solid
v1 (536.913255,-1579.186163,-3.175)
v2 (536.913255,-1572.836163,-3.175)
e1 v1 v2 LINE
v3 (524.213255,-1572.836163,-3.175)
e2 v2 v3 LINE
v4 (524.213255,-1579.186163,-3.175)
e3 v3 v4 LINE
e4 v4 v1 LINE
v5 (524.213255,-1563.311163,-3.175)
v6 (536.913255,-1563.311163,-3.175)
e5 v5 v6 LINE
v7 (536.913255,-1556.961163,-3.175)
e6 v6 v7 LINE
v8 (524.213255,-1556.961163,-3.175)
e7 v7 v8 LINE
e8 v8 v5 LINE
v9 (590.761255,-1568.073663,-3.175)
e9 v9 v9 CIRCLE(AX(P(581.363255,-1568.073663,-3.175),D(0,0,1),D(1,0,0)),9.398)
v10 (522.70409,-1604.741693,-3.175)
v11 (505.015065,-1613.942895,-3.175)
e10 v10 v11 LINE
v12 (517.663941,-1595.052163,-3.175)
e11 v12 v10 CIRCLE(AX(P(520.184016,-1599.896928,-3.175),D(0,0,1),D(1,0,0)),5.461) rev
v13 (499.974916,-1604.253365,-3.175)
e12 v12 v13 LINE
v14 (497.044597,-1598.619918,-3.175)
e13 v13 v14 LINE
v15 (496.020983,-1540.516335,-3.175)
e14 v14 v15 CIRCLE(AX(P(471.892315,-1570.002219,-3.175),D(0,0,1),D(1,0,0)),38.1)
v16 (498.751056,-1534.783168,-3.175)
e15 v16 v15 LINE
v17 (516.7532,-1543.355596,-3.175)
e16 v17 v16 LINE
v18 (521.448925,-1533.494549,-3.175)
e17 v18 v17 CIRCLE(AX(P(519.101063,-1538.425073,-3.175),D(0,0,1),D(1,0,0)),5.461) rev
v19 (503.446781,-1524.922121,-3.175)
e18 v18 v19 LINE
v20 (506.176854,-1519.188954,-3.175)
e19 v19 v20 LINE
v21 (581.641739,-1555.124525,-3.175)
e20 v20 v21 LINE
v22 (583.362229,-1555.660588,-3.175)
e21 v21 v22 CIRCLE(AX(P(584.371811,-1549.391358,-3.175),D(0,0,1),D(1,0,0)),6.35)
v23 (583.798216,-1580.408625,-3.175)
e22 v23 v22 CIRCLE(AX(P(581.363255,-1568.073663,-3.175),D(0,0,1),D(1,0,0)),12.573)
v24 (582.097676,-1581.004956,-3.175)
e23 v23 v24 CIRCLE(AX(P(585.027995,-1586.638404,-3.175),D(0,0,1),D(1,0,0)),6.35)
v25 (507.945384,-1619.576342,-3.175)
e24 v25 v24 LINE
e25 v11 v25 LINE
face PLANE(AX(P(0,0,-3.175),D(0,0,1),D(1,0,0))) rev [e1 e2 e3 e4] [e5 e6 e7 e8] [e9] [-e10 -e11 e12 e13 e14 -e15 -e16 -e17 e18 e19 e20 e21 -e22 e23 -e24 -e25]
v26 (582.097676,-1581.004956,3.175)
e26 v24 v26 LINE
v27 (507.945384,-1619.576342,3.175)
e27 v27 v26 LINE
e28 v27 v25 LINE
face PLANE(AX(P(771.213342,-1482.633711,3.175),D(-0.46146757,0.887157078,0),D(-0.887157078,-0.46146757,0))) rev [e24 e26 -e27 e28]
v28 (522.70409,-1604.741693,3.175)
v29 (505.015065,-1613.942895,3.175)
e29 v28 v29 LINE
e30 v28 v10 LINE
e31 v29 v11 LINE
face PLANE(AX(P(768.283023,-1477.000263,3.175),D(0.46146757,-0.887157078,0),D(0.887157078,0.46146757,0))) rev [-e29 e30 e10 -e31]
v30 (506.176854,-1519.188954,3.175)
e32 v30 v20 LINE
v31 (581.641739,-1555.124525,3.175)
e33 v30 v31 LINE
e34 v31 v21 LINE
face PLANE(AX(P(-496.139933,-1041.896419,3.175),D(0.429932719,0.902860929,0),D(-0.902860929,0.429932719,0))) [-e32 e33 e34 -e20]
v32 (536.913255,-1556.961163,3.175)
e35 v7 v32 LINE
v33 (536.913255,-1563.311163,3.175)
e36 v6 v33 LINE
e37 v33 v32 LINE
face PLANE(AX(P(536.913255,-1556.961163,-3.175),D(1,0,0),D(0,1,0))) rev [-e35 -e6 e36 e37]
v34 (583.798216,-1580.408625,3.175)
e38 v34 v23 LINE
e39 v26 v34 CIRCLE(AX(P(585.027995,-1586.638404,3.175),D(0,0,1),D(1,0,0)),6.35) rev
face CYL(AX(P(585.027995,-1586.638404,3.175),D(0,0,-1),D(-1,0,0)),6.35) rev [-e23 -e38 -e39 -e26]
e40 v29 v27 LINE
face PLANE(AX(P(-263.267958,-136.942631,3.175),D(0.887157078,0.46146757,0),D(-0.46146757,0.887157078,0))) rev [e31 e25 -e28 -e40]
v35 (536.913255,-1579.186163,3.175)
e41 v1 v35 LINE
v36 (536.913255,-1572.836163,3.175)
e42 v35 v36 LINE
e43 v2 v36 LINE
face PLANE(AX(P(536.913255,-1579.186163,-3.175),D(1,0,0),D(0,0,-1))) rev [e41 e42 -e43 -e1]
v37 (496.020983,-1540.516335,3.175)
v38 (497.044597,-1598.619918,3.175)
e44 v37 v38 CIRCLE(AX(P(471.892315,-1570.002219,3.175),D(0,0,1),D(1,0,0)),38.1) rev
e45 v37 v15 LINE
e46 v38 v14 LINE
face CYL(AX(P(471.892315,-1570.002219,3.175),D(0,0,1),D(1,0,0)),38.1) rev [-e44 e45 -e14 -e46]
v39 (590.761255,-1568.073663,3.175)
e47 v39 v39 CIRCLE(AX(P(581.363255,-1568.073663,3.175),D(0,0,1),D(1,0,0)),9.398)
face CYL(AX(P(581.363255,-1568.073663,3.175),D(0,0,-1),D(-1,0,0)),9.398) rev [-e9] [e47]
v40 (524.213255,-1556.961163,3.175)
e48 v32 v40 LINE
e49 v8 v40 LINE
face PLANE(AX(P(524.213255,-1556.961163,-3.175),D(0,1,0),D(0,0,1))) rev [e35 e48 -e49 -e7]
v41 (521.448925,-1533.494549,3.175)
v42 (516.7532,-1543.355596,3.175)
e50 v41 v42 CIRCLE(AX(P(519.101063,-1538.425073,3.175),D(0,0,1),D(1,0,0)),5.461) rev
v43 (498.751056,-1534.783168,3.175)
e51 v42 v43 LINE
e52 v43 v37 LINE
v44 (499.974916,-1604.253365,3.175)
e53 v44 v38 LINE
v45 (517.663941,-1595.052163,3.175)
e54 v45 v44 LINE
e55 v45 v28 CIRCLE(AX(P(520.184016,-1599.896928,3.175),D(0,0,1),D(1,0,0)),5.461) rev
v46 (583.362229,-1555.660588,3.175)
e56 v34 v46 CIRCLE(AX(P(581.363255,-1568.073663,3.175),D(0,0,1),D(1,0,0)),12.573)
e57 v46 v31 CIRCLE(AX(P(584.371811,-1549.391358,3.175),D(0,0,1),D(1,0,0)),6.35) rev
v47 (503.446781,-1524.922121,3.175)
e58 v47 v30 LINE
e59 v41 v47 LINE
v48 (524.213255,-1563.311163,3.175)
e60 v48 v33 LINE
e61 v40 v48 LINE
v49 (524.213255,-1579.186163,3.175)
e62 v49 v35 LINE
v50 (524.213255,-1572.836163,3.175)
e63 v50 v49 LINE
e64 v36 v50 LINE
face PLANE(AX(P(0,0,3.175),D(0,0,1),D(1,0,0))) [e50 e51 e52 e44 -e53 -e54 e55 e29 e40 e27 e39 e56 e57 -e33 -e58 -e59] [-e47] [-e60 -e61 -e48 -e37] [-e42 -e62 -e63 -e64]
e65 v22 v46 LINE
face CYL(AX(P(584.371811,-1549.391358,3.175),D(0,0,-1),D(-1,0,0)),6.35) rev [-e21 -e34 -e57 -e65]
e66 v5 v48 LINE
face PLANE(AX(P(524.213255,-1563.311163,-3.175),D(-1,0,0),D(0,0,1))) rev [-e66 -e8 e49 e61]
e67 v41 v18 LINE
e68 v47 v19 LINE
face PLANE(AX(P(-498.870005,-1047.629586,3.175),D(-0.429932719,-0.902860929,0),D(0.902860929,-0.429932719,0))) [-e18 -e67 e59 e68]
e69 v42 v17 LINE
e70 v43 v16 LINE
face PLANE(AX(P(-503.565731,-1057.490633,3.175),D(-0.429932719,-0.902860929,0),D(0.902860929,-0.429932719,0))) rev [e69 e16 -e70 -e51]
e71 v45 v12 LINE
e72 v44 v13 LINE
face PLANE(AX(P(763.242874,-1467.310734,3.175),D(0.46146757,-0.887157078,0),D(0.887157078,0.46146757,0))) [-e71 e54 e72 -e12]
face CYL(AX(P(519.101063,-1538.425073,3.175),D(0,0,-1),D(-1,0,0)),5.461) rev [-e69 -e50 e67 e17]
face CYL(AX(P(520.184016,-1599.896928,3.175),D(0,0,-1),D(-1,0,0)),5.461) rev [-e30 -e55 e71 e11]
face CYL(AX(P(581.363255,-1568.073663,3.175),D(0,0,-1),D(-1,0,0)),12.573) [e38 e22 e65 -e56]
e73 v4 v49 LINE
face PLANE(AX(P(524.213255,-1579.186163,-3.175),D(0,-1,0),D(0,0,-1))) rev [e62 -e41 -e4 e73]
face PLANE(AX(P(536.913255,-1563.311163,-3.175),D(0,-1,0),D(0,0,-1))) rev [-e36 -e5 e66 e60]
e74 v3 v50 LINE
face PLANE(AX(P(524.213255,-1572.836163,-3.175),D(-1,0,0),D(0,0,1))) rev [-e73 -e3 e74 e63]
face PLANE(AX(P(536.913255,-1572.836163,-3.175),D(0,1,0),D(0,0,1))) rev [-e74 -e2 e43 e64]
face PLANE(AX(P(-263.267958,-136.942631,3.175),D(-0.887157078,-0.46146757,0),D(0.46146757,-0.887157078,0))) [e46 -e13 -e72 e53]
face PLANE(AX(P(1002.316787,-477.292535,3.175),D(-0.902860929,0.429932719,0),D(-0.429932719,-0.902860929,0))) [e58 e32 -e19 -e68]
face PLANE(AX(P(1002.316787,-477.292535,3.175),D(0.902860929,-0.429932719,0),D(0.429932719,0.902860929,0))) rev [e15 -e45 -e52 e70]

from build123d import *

# Parameters (mm, degrees)
SKETCH1_R           = 12.573
SKETCH1_R_2         = 9.398
BOSS_EXTRUDE1_DEPTH = 3.175
FILLET1_R           = 38.1
FILLET2_R           = 6.35
SKETCH2_W           = 12.7
SKETCH2_H           = 6.35
CUT_EXTRUDE1_DEPTH  = 3.175


with BuildPart() as part:
    # Sketch1 → Boss-Extrude1 (new, symmetric)
    # profile 1 of 4: a face of its own
    with BuildSketch(Plane.XY):
        with BuildLine():
            Line((503.446781124, -1524.922120572), (521.448925186, -1533.494549061))
            ThreePointArc((521.448925186, -1533.494549061), (524.031586139, -1540.772935173), (516.753200026, -1543.355596126))
            Line((516.753200026, -1543.355596126), (498.751055965, -1534.783167637))
            Line((498.751055965, -1534.783167637), (496.020983198, -1540.516334536))
            Line((496.020983198, -1540.516334536), (554.871597872, -1568.540367902))
            Line((554.871597872, -1568.540367902), (572.088750719, -1559.584617136))
            ThreePointArc((572.088750719, -1559.584617136), (576.84535815, -1556.340422204), (582.549387726, -1555.556737566))
            Line((582.549387726, -1555.556737566), (506.176853892, -1519.188953673))
            Line((506.176853892, -1519.188953673), (503.446781124, -1524.922120572))
        make_face()
    # profile 2 of 4: a face of its own
    with BuildSketch(Plane.XY):
        with BuildLine():
            ThreePointArc((572.393517032, -1576.884118428), (568.792205752, -1568.295127748), (572.088750719, -1559.584617136))
            Line((572.088750719, -1559.584617136), (554.871597872, -1568.540367902))
            Line((554.871597872, -1568.540367902), (572.393517032, -1576.884118428))
        make_face()
    # profile 3 of 4: a face of its own
    with BuildSketch(Plane.XY):
        with BuildLine():
            Line((572.393517032, -1576.884118428), (554.871597872, -1568.540367902))
            Line((554.871597872, -1568.540367902), (497.044597377, -1598.619917556))
            Line((497.044597377, -1598.619917556), (499.974916446, -1604.253365004))
            Line((499.974916446, -1604.253365004), (517.663941434, -1595.052163128))
            ThreePointArc((517.663941434, -1595.052163128), (525.028780639, -1597.376853534), (522.704090232, -1604.741692739))
            Line((522.704090232, -1604.741692739), (505.015065244, -1613.942894615))
            Line((505.015065244, -1613.942894615), (507.945384313, -1619.576342064))
            Line((507.945384313, -1619.576342064), (582.989537655, -1580.541041645))
            ThreePointArc((582.989537655, -1580.541041645), (577.261443726, -1579.958757387), (572.393517032, -1576.884118428))
        make_face()
    # profile 4 of 4: a face of its own
    with BuildSketch(Plane.XY):
        with Locations((581.363255123, -1568.073662845)):
            Circle(SKETCH1_R)
        with Locations((581.363255123, -1568.073662845)):
            Circle(SKETCH1_R_2, mode=Mode.SUBTRACT)
    extrude(amount=BOSS_EXTRUDE1_DEPTH, both=True)

    # Fillet1
    # the kernel refuses this fillet: 38.1 mm, written as the material it adds along each edge
    with BuildSketch(Plane(origin=(554.871597872, -1568.540367902, -3.175), x_dir=(-0.9028609288940066, 0.4299327192441295, 0), z_dir=(0, 0, 1))) as fillet1_piece_1:
        with BuildLine():
            CenterArc((74.290255, 36.995356759), FILLET1_R, 156.775740193, 99.393657747)
            Line((39.277556806, 52.01936971), (0, 0))
            Line((0, 0), (65.1823695, 0))
        make_face()
    extrude(amount=6.35)

    # Fillet2
    fillet2_edges = [part.edges().sort_by_distance(p)[0] for p in [
        (582.549387726, -1555.556737566, 0),
        (582.989537655, -1580.541041645, 0),
    ]]
    fillet(fillet2_edges, radius=FILLET2_R)

    # Sketch2 → Cut-Extrude1 (cut, symmetric)
    with BuildSketch(Plane.XY):
        with Locations((530.563255123, -1560.136162845)):
            Rectangle(SKETCH2_W, SKETCH2_H)
        with Locations((530.563255123, -1576.011162845)):
            Rectangle(SKETCH2_W, SKETCH2_H)
    extrude(amount=CUT_EXTRUDE1_DEPTH, both=True, mode=Mode.SUBTRACT)


solid = part.part
